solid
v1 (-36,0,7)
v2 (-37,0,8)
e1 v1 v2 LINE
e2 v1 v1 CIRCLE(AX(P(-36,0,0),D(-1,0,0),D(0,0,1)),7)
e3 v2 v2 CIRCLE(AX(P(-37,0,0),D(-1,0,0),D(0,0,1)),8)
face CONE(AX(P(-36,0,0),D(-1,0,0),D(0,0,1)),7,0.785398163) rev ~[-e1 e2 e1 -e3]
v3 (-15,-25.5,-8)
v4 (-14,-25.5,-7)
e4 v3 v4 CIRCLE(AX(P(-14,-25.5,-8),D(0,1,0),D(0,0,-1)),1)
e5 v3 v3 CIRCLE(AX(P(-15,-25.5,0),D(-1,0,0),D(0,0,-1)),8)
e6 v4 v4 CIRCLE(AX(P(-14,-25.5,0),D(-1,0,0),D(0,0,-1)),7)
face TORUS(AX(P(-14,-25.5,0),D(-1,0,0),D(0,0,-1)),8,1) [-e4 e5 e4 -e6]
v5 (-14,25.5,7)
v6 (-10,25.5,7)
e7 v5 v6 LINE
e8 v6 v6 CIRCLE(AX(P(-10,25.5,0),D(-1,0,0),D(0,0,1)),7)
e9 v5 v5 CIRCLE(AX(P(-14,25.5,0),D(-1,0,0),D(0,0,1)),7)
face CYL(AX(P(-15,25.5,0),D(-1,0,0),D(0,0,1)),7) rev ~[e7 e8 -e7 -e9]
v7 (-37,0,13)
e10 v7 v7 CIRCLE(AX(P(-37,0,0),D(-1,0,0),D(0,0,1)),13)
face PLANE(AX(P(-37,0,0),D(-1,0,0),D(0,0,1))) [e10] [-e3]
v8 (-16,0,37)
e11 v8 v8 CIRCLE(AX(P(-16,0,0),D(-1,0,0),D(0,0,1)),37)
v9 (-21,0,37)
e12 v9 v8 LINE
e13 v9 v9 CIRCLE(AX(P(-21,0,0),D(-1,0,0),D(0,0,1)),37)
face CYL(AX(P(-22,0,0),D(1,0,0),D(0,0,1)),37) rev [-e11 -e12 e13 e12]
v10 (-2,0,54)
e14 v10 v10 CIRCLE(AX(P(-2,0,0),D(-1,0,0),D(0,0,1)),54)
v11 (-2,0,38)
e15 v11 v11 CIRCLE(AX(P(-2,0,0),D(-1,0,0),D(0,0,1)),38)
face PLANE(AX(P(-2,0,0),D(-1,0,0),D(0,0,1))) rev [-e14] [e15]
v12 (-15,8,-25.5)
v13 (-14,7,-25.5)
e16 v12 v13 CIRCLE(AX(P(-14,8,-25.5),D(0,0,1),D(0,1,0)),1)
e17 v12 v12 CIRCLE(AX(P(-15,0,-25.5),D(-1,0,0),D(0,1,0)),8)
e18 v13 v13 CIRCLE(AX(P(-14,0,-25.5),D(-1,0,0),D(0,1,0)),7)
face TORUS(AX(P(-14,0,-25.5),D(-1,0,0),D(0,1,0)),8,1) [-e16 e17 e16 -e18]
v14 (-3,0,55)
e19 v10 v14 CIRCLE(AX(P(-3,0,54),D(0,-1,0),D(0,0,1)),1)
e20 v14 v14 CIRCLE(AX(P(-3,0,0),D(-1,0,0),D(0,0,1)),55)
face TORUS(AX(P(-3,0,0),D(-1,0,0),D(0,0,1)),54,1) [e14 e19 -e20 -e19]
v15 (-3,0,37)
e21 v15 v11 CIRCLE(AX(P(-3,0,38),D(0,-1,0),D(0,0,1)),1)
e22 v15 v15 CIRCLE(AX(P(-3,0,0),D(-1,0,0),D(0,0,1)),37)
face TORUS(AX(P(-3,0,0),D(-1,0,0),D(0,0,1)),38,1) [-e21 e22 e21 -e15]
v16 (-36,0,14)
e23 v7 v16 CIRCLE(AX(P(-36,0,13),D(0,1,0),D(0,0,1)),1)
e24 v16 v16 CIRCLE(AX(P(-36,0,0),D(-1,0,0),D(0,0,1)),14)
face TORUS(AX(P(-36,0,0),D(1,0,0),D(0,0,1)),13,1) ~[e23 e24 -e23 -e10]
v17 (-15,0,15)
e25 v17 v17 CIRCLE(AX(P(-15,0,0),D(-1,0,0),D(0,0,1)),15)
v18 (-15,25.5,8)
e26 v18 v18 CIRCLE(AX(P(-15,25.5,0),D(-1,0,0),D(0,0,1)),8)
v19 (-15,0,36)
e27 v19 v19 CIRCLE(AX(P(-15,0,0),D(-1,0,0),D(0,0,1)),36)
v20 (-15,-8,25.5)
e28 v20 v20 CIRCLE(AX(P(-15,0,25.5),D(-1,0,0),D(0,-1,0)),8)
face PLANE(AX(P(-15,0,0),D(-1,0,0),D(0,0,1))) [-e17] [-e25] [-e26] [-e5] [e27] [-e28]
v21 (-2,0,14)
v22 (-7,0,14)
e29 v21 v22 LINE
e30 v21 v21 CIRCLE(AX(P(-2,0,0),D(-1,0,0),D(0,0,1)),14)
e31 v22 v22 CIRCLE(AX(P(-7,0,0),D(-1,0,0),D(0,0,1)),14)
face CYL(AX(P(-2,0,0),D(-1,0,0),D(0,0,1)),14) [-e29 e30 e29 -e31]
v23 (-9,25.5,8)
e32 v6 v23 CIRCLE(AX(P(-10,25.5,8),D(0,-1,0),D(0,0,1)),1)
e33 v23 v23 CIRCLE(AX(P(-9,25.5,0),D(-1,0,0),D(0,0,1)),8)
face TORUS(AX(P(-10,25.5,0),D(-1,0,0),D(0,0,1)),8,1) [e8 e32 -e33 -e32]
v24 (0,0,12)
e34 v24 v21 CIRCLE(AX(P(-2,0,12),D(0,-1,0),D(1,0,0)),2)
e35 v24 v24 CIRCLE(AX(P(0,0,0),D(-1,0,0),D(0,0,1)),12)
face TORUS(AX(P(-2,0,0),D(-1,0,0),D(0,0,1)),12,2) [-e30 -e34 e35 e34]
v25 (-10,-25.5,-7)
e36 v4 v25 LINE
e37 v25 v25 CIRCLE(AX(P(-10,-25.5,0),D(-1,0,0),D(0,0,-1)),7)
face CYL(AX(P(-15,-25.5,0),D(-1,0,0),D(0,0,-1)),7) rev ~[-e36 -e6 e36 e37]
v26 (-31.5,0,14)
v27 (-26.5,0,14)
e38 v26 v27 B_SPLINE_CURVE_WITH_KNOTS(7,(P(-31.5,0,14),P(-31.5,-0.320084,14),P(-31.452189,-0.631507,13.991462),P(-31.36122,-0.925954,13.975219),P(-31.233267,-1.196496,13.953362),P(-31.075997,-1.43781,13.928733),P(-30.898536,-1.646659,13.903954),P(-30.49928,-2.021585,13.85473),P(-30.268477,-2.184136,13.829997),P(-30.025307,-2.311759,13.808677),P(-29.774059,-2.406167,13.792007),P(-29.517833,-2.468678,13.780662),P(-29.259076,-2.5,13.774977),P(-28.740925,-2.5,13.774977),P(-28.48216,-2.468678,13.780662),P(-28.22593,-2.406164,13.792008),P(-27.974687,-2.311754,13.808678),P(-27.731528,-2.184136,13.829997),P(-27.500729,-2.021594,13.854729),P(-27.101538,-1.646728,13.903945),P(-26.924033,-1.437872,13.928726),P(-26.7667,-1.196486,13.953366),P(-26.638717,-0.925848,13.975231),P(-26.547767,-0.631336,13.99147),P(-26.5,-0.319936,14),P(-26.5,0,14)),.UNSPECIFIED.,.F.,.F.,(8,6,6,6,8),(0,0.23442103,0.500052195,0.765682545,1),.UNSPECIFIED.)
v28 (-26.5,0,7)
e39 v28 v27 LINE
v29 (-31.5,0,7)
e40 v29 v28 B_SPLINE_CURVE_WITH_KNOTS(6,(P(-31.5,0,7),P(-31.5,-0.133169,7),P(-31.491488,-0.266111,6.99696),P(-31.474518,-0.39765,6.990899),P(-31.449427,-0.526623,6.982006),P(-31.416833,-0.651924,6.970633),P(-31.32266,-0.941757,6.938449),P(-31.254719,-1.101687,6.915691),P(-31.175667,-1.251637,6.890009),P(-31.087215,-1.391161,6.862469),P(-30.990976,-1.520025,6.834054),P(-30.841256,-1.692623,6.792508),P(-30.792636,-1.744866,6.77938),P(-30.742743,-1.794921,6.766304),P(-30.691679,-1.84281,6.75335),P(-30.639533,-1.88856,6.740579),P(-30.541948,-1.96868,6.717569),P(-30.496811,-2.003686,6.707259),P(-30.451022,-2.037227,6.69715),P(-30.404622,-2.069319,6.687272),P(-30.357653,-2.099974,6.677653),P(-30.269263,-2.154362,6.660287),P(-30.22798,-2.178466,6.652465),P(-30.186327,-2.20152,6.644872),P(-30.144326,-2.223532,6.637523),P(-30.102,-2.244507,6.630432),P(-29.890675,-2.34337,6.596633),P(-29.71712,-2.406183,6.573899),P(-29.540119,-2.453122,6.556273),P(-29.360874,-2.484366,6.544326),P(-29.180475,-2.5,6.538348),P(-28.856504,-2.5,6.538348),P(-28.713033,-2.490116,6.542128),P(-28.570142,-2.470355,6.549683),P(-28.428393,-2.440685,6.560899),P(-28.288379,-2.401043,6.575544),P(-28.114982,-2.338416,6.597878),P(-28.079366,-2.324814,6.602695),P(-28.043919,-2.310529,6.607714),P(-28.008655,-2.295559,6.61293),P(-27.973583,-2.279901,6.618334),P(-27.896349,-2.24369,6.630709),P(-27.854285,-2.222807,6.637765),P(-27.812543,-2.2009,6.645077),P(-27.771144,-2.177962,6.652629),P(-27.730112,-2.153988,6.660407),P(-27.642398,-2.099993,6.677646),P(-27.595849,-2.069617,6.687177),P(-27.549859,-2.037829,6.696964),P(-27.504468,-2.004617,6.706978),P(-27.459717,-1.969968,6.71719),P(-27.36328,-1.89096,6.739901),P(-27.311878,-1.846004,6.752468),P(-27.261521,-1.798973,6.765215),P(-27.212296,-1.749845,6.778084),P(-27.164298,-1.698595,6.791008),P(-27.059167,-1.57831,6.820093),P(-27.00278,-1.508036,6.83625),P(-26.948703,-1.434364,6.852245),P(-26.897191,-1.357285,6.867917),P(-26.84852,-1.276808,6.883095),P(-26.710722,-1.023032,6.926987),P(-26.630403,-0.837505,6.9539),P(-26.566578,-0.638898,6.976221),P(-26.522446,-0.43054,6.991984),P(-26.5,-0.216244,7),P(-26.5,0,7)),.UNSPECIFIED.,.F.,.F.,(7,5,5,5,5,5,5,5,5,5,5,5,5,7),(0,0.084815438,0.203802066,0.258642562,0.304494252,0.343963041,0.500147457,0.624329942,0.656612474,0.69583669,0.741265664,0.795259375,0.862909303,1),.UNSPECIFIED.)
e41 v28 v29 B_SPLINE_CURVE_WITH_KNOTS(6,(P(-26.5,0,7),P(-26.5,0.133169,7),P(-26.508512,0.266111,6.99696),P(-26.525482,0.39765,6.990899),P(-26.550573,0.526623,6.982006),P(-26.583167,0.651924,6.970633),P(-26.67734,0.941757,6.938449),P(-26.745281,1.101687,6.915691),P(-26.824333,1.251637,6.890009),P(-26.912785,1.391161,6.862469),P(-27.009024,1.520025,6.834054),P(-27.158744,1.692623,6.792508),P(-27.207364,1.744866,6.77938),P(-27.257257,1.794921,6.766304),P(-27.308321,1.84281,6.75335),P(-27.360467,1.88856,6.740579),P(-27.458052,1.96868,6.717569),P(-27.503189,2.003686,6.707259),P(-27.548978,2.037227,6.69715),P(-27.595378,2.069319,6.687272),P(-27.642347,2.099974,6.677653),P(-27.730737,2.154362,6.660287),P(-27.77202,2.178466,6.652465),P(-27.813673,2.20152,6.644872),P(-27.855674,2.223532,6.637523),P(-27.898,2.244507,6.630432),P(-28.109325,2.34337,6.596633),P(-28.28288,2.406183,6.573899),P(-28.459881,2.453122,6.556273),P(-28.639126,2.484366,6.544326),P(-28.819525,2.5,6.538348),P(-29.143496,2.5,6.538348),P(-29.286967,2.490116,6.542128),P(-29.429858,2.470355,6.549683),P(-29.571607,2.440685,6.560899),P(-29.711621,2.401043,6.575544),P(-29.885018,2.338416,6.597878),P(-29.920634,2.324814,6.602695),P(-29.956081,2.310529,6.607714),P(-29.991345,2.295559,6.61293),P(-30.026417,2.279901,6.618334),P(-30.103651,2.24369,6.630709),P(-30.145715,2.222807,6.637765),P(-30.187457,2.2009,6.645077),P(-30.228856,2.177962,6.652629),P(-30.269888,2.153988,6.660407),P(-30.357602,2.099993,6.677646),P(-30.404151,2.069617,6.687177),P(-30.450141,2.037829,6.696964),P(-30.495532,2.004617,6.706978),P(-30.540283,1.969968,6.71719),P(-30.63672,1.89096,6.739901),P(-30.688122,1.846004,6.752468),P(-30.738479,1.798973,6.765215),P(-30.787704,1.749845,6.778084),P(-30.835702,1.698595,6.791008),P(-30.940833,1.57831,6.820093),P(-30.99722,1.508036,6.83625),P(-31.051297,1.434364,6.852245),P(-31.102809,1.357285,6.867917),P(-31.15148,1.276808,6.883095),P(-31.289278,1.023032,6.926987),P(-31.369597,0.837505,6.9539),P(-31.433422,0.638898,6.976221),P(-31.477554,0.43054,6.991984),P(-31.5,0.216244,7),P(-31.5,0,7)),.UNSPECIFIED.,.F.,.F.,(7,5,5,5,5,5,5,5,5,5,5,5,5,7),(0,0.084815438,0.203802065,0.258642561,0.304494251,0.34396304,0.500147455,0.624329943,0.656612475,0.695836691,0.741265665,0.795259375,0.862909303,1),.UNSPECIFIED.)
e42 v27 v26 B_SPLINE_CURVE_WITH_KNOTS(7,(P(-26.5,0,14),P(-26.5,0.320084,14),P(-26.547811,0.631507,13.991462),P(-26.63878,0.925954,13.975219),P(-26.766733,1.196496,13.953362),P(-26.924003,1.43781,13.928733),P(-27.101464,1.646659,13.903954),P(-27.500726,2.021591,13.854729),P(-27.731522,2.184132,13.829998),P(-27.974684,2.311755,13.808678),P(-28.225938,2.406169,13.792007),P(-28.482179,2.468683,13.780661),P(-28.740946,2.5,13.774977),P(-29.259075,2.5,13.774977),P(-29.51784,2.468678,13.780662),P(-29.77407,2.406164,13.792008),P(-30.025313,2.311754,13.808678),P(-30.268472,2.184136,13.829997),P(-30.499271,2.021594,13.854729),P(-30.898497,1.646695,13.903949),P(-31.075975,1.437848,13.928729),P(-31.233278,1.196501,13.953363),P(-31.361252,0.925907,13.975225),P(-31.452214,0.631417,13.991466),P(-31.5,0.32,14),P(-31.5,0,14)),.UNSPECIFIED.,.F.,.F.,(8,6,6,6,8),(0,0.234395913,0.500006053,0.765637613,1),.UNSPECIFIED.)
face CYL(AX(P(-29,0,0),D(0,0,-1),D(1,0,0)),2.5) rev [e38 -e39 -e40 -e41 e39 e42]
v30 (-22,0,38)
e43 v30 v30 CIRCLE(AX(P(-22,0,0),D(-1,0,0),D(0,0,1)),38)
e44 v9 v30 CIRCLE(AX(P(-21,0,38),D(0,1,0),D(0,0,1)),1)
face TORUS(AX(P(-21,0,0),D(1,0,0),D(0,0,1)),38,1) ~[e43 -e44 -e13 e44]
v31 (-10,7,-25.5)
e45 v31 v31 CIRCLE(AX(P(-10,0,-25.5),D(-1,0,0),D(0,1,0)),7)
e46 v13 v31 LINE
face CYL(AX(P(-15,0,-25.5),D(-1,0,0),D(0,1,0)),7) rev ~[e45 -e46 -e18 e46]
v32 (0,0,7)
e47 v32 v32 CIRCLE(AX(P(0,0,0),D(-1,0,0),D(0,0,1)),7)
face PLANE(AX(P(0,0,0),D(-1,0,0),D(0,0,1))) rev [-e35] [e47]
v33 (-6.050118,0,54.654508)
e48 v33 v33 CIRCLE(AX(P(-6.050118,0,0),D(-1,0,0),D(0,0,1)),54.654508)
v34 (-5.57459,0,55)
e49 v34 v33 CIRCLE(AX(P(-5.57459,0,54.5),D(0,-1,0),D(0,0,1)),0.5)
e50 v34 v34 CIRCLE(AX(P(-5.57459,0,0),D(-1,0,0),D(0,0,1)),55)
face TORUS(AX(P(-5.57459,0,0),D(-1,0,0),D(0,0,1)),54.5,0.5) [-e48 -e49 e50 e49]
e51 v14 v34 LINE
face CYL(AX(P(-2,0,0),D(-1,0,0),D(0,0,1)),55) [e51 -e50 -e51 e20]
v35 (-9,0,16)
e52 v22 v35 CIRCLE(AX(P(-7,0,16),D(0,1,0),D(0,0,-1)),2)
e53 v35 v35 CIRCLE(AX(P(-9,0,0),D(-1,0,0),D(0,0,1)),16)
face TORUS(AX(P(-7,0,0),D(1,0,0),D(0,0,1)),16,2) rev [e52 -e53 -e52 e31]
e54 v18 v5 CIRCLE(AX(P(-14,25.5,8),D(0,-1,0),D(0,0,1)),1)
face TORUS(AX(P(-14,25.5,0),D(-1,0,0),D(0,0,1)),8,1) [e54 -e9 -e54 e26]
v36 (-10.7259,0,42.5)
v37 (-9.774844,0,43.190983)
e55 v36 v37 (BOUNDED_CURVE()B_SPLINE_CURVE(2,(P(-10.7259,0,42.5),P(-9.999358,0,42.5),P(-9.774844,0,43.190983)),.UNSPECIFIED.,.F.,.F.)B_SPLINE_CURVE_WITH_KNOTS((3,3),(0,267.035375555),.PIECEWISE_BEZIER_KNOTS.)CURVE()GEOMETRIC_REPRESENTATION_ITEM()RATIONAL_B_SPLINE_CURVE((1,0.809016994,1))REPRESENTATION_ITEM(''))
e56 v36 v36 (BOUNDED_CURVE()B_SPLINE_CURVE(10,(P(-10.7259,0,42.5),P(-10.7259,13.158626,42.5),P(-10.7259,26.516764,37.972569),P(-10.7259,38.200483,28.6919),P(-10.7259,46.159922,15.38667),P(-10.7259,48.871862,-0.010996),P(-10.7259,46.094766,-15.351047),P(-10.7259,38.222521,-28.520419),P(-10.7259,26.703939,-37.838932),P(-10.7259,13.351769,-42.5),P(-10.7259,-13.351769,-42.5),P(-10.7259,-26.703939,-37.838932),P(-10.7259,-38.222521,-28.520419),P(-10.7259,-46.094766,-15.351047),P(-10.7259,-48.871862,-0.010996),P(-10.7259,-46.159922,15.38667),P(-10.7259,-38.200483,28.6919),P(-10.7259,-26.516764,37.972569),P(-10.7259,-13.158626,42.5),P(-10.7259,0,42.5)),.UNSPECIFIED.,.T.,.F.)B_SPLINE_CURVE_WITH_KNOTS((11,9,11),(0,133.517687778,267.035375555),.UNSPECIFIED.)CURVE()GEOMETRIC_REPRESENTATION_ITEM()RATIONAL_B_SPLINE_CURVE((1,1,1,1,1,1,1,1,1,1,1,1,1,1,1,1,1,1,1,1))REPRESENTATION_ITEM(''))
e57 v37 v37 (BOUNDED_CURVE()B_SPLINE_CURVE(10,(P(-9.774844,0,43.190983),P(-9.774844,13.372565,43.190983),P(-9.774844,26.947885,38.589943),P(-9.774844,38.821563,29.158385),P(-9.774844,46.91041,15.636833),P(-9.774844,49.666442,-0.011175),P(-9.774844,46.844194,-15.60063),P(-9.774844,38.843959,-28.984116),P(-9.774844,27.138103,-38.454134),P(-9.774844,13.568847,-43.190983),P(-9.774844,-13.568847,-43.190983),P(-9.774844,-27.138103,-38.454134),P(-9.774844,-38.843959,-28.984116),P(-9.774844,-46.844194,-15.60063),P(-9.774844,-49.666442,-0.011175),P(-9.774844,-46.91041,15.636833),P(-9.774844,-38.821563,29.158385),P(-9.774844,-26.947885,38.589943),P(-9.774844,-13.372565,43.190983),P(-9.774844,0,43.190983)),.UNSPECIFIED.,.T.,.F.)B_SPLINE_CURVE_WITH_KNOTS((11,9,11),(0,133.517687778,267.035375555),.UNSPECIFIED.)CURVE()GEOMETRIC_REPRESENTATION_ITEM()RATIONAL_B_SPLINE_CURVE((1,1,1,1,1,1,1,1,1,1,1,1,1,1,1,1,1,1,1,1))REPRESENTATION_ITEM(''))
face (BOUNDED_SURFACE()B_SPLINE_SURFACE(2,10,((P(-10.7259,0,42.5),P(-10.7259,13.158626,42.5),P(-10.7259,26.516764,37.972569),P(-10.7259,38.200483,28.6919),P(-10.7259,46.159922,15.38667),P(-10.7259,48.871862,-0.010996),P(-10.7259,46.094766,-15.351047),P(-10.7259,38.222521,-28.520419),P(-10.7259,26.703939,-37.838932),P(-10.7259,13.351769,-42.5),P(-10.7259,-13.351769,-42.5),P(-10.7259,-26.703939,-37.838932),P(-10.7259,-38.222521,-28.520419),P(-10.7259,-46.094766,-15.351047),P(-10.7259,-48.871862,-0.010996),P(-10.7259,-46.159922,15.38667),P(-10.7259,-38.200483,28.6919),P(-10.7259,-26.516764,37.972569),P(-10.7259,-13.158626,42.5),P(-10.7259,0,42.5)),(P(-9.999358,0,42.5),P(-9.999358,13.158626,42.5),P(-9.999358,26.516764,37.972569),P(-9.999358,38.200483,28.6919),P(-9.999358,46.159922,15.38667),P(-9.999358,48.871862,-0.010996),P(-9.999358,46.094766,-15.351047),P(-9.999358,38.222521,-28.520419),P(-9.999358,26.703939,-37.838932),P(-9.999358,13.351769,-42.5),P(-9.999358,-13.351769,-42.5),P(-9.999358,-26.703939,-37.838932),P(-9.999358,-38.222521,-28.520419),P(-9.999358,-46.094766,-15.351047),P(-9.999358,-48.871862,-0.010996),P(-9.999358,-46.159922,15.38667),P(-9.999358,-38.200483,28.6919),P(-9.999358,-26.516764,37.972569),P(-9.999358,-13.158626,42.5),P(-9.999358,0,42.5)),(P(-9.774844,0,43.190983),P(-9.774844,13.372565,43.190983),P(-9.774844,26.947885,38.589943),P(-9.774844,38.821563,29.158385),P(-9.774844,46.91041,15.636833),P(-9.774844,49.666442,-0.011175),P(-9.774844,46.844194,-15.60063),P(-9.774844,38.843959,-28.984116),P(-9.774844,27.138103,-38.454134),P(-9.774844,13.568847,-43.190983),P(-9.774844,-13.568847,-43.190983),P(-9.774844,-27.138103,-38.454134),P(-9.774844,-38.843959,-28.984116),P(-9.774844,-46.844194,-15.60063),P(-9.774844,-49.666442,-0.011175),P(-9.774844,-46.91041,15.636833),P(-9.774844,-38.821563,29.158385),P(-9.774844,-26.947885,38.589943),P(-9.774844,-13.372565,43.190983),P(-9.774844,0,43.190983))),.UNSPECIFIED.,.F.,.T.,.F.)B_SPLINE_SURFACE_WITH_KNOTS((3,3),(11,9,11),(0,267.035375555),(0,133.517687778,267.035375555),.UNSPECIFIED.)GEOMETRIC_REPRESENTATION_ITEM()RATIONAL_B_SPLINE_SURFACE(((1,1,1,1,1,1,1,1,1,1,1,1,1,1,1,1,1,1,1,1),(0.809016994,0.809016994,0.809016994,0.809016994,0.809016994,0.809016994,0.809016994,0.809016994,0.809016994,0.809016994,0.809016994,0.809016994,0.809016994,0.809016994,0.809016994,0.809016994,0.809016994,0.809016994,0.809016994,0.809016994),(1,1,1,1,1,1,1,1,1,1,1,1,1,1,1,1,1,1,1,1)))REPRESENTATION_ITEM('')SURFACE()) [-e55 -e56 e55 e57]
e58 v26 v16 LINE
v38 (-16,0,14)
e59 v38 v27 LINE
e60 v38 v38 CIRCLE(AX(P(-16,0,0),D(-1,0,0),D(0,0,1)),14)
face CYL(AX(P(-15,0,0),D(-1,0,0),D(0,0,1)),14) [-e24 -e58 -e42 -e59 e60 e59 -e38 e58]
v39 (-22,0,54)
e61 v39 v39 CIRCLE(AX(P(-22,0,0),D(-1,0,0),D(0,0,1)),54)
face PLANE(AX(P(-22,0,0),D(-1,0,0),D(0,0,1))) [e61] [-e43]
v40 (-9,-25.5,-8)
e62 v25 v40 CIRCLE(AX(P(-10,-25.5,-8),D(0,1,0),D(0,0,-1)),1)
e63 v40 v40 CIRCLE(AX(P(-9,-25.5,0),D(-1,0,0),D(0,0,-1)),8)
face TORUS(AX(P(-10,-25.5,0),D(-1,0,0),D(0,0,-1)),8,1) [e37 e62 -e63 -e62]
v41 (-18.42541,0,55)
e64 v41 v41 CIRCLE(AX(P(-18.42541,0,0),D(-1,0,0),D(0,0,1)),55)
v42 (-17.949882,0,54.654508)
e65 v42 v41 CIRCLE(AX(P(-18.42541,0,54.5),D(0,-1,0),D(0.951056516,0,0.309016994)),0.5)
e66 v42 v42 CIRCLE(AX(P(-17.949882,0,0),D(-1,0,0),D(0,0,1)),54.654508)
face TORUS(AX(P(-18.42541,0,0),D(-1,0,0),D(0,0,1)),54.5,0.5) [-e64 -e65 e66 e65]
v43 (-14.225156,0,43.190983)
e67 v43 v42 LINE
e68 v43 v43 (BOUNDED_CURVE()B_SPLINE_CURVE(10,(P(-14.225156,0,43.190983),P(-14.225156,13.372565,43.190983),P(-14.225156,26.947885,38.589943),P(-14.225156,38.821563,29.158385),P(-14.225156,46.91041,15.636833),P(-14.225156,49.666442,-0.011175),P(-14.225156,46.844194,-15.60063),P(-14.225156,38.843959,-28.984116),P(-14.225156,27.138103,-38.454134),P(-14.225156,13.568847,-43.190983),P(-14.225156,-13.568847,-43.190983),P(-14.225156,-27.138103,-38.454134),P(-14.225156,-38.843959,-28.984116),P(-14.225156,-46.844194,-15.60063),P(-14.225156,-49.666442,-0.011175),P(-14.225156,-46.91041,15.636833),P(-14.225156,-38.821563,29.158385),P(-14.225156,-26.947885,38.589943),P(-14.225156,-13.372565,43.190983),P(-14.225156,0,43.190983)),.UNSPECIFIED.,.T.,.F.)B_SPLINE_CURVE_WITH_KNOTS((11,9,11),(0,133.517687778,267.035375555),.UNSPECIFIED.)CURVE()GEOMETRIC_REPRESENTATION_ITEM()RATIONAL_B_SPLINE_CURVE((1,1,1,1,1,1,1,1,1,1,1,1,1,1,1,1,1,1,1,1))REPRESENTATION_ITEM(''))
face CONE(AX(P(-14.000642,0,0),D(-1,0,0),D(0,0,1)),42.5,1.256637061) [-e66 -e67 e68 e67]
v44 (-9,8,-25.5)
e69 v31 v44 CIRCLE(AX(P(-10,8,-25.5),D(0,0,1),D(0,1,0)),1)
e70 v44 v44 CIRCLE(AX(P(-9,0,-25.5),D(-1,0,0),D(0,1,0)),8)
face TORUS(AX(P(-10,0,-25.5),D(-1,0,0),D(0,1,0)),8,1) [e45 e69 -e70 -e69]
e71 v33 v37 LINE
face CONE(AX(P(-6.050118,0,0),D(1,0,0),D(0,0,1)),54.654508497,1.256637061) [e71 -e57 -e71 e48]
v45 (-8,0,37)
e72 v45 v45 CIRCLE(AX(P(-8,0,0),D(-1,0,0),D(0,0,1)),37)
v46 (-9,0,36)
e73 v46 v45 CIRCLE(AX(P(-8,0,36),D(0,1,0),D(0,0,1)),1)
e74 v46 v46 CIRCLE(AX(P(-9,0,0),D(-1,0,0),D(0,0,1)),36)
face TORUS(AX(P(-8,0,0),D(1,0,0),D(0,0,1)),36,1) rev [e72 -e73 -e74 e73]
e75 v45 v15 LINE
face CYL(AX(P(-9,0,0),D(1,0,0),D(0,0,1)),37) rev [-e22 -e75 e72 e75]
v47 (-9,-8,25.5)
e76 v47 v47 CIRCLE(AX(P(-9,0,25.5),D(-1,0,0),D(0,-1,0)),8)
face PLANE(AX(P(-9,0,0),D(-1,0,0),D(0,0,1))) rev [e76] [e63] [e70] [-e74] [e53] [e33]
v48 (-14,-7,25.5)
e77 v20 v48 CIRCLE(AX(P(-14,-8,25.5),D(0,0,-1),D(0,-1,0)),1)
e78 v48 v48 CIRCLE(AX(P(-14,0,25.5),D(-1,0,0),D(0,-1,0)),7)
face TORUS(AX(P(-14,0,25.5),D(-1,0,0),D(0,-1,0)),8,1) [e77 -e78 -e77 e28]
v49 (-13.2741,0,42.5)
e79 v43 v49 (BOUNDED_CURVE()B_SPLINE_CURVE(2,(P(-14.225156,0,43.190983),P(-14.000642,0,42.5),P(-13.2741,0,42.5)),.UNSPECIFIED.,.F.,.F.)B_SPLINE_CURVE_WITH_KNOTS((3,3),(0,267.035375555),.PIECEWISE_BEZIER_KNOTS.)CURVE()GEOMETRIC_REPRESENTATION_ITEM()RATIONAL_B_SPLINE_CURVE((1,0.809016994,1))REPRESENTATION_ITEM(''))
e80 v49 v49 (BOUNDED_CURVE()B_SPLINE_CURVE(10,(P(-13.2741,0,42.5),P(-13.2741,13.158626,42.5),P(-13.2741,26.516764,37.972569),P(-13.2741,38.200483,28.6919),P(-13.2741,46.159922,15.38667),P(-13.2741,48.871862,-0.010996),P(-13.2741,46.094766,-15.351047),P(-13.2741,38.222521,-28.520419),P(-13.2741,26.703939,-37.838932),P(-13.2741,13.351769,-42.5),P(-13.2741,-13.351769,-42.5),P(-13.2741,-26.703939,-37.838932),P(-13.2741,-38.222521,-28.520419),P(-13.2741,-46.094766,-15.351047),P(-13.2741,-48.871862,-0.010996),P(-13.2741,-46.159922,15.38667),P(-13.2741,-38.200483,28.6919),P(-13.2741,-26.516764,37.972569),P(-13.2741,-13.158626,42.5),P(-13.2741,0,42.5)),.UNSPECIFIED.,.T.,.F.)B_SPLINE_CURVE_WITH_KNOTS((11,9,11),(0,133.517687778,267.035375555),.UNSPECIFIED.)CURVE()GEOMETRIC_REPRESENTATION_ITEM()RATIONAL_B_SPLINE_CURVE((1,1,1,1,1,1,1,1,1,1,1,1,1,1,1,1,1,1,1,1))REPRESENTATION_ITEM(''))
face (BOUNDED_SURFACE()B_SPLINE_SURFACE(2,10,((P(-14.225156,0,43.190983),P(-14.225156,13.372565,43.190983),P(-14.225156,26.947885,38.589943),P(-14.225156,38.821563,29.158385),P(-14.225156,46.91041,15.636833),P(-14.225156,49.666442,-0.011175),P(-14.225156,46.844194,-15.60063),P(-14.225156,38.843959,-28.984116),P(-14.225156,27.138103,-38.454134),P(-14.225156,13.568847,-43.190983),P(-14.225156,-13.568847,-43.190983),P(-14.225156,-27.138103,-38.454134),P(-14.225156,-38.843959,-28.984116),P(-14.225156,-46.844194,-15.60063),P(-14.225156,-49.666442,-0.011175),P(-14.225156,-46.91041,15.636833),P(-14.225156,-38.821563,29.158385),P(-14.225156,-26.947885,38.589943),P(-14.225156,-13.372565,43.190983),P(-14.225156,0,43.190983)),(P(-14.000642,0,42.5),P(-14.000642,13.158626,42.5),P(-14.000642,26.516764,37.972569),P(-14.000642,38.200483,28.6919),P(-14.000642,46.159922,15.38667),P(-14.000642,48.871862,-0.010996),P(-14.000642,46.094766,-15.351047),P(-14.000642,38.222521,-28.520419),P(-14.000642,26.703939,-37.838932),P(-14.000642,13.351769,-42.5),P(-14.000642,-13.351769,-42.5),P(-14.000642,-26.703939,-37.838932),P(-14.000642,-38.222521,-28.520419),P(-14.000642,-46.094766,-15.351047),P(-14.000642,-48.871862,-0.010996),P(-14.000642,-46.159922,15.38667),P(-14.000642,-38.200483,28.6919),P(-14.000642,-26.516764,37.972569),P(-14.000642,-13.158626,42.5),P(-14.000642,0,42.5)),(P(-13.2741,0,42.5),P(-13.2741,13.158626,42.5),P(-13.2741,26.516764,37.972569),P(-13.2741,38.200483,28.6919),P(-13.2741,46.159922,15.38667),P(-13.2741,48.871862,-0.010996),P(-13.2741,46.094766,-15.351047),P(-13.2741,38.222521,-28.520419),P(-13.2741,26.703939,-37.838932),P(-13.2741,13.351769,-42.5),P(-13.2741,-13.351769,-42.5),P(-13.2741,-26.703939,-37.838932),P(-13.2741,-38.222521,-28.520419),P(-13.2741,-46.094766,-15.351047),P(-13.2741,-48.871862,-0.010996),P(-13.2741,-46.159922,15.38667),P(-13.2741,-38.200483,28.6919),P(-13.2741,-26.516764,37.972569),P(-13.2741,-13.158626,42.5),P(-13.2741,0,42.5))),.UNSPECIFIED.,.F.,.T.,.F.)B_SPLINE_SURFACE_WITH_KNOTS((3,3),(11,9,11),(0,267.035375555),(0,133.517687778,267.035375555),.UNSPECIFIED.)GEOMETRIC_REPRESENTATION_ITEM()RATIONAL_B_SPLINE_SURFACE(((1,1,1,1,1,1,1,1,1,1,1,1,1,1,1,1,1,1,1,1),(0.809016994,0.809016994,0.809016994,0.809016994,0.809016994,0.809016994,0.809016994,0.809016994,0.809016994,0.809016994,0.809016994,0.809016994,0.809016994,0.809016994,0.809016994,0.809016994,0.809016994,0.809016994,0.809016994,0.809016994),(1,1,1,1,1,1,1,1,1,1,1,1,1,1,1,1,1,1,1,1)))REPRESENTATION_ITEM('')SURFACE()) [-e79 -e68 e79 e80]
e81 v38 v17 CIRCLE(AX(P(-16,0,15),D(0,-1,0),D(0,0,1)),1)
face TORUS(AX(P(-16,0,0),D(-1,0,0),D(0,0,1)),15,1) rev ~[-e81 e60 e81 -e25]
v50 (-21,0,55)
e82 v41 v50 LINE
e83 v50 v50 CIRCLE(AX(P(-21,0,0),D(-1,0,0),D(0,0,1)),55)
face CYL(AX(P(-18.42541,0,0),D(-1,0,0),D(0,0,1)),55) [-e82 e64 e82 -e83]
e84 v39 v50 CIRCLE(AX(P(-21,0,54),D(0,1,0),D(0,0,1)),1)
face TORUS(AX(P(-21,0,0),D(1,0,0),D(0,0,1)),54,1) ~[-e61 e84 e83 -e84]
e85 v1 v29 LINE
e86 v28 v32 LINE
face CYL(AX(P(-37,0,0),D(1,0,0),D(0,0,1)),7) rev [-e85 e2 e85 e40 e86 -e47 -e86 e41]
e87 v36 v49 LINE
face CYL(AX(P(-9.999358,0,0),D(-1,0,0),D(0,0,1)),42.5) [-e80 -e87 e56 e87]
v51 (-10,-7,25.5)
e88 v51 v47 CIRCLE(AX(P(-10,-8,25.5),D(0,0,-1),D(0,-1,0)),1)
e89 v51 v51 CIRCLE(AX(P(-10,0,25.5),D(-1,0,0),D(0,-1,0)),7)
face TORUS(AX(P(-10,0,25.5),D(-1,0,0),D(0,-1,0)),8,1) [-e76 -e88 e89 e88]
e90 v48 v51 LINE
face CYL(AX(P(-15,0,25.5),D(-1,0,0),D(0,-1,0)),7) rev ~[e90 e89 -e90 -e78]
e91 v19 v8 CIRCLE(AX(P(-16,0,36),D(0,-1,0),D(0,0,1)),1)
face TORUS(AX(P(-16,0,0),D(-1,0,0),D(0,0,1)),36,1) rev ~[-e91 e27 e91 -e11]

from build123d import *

# Parameters (mm, degrees)
F2_R            = 7
F3_DEPTH        = 6
F3_COPIES_COUNT = 4
F4_R            = 2.5
F5_DEPTH        = 55.0010001
F6_SIZE         = 1
F7_R            = 1


# Not quite as in the source:
# - a pattern or mirror of a feature is missing from the dataset's text; its kind, count and spacing are read off the source's solid


with BuildPart() as f1:
    # F0 (on Front) → F1 (revolve)
    with BuildSketch(Plane.XZ):
        with BuildLine():
            Line((-37, 7), (0, 7))
            Line((0, 7), (0, 12))
            ThreePointArc((0, 12), (-0.5857864376, 13.4142135624), (-2, 14))
            Line((-2, 14), (-7, 14))
            ThreePointArc((-7, 14), (-8.4142135624, 14.5857864376), (-9, 16))
            Line((-9, 16), (-9, 37))
            Line((-9, 37), (-2, 37))
            Line((-2, 37), (-2, 55))
            Line((-2, 55), (-5.5745901029, 55))
            ThreePointArc((-5.5745901029, 55), (-5.8684827291, 54.9045084972), (-6.0501183611, 54.6545084972))
            Line((-6.0501183611, 54.6545084972), (-9.9993575699, 42.5))
            Line((-9.9993575699, 42.5), (-14.0006424301, 42.5))
            Line((-14.0006424301, 42.5), (-17.9498816389, 54.6545084972))
            ThreePointArc((-17.9498816389, 54.6545084972), (-18.1315172709, 54.9045084972), (-18.4254098971, 55))
            Line((-18.4254098971, 55), (-22, 55))
            Line((-22, 55), (-22, 37))
            Line((-22, 37), (-15, 37))
            Line((-15, 37), (-15, 14))
            Line((-15, 14), (-37, 14))
            Line((-37, 14), (-37, 7))
        make_face()
    revolve(axis=Axis((-17.3296256442, 0, 0), (-1, 0, 0)))

    # F2 (on face) → F3 (cut, through all)
    with BuildSketch(Plane(origin=(-15, 0, 0), x_dir=(0, -1, 0), z_dir=(-1, 0, 0))):
        with Locations((0, 25.5)):
            Circle(F2_R)
    f3 = extrude(amount=-F3_DEPTH, mode=Mode.SUBTRACT)

    # F3_copies: F3 ×4 about axis
    f3_copies_axis = Axis((0, 0, 0), (1, 0, 0))
    for i in range(1, F3_COPIES_COUNT):
        add(f3.rotate(f3_copies_axis, i * 360 / F3_COPIES_COUNT), mode=Mode.SUBTRACT)

    # F4 (on Top) → F5 (cut, through all)
    with BuildSketch(Plane.XY):
        with Locations((-29, 0)):
            Circle(F4_R)
    extrude(amount=F5_DEPTH, mode=Mode.SUBTRACT)

    # F6
    f6_edges = [f1.edges().sort_by_distance(p)[0] for p in [
        (-37, 0, -7),
    ]]
    chamfer(f6_edges, length=F6_SIZE)

    # F7
    f7_edges = [f1.edges().sort_by_distance(p)[0] for p in [
        (-37, 0, -14),
        (-15, 0, -37),
        (-22, 0, -37),
        (-22, 0, -55),
        (-15, 0, -14),
        (-15, 7, 25.5),
        (-2, 0, -55),
        (-2, 0, -37),
        (-9, 0, -37),
        (-9, 7, 25.5),
        (-14.000642, 0, -42.5),
        (-9.999358, 0, -42.5),
        (-15, -25.5, 7),
        (-15, -7, -25.5),
        (-15, 25.5, -7),
        (-9, -25.5, 7),
        (-9, -7, -25.5),
        (-9, 25.5, -7),
    ]]
    fillet(f7_edges, radius=F7_R)


solid = f1.part
